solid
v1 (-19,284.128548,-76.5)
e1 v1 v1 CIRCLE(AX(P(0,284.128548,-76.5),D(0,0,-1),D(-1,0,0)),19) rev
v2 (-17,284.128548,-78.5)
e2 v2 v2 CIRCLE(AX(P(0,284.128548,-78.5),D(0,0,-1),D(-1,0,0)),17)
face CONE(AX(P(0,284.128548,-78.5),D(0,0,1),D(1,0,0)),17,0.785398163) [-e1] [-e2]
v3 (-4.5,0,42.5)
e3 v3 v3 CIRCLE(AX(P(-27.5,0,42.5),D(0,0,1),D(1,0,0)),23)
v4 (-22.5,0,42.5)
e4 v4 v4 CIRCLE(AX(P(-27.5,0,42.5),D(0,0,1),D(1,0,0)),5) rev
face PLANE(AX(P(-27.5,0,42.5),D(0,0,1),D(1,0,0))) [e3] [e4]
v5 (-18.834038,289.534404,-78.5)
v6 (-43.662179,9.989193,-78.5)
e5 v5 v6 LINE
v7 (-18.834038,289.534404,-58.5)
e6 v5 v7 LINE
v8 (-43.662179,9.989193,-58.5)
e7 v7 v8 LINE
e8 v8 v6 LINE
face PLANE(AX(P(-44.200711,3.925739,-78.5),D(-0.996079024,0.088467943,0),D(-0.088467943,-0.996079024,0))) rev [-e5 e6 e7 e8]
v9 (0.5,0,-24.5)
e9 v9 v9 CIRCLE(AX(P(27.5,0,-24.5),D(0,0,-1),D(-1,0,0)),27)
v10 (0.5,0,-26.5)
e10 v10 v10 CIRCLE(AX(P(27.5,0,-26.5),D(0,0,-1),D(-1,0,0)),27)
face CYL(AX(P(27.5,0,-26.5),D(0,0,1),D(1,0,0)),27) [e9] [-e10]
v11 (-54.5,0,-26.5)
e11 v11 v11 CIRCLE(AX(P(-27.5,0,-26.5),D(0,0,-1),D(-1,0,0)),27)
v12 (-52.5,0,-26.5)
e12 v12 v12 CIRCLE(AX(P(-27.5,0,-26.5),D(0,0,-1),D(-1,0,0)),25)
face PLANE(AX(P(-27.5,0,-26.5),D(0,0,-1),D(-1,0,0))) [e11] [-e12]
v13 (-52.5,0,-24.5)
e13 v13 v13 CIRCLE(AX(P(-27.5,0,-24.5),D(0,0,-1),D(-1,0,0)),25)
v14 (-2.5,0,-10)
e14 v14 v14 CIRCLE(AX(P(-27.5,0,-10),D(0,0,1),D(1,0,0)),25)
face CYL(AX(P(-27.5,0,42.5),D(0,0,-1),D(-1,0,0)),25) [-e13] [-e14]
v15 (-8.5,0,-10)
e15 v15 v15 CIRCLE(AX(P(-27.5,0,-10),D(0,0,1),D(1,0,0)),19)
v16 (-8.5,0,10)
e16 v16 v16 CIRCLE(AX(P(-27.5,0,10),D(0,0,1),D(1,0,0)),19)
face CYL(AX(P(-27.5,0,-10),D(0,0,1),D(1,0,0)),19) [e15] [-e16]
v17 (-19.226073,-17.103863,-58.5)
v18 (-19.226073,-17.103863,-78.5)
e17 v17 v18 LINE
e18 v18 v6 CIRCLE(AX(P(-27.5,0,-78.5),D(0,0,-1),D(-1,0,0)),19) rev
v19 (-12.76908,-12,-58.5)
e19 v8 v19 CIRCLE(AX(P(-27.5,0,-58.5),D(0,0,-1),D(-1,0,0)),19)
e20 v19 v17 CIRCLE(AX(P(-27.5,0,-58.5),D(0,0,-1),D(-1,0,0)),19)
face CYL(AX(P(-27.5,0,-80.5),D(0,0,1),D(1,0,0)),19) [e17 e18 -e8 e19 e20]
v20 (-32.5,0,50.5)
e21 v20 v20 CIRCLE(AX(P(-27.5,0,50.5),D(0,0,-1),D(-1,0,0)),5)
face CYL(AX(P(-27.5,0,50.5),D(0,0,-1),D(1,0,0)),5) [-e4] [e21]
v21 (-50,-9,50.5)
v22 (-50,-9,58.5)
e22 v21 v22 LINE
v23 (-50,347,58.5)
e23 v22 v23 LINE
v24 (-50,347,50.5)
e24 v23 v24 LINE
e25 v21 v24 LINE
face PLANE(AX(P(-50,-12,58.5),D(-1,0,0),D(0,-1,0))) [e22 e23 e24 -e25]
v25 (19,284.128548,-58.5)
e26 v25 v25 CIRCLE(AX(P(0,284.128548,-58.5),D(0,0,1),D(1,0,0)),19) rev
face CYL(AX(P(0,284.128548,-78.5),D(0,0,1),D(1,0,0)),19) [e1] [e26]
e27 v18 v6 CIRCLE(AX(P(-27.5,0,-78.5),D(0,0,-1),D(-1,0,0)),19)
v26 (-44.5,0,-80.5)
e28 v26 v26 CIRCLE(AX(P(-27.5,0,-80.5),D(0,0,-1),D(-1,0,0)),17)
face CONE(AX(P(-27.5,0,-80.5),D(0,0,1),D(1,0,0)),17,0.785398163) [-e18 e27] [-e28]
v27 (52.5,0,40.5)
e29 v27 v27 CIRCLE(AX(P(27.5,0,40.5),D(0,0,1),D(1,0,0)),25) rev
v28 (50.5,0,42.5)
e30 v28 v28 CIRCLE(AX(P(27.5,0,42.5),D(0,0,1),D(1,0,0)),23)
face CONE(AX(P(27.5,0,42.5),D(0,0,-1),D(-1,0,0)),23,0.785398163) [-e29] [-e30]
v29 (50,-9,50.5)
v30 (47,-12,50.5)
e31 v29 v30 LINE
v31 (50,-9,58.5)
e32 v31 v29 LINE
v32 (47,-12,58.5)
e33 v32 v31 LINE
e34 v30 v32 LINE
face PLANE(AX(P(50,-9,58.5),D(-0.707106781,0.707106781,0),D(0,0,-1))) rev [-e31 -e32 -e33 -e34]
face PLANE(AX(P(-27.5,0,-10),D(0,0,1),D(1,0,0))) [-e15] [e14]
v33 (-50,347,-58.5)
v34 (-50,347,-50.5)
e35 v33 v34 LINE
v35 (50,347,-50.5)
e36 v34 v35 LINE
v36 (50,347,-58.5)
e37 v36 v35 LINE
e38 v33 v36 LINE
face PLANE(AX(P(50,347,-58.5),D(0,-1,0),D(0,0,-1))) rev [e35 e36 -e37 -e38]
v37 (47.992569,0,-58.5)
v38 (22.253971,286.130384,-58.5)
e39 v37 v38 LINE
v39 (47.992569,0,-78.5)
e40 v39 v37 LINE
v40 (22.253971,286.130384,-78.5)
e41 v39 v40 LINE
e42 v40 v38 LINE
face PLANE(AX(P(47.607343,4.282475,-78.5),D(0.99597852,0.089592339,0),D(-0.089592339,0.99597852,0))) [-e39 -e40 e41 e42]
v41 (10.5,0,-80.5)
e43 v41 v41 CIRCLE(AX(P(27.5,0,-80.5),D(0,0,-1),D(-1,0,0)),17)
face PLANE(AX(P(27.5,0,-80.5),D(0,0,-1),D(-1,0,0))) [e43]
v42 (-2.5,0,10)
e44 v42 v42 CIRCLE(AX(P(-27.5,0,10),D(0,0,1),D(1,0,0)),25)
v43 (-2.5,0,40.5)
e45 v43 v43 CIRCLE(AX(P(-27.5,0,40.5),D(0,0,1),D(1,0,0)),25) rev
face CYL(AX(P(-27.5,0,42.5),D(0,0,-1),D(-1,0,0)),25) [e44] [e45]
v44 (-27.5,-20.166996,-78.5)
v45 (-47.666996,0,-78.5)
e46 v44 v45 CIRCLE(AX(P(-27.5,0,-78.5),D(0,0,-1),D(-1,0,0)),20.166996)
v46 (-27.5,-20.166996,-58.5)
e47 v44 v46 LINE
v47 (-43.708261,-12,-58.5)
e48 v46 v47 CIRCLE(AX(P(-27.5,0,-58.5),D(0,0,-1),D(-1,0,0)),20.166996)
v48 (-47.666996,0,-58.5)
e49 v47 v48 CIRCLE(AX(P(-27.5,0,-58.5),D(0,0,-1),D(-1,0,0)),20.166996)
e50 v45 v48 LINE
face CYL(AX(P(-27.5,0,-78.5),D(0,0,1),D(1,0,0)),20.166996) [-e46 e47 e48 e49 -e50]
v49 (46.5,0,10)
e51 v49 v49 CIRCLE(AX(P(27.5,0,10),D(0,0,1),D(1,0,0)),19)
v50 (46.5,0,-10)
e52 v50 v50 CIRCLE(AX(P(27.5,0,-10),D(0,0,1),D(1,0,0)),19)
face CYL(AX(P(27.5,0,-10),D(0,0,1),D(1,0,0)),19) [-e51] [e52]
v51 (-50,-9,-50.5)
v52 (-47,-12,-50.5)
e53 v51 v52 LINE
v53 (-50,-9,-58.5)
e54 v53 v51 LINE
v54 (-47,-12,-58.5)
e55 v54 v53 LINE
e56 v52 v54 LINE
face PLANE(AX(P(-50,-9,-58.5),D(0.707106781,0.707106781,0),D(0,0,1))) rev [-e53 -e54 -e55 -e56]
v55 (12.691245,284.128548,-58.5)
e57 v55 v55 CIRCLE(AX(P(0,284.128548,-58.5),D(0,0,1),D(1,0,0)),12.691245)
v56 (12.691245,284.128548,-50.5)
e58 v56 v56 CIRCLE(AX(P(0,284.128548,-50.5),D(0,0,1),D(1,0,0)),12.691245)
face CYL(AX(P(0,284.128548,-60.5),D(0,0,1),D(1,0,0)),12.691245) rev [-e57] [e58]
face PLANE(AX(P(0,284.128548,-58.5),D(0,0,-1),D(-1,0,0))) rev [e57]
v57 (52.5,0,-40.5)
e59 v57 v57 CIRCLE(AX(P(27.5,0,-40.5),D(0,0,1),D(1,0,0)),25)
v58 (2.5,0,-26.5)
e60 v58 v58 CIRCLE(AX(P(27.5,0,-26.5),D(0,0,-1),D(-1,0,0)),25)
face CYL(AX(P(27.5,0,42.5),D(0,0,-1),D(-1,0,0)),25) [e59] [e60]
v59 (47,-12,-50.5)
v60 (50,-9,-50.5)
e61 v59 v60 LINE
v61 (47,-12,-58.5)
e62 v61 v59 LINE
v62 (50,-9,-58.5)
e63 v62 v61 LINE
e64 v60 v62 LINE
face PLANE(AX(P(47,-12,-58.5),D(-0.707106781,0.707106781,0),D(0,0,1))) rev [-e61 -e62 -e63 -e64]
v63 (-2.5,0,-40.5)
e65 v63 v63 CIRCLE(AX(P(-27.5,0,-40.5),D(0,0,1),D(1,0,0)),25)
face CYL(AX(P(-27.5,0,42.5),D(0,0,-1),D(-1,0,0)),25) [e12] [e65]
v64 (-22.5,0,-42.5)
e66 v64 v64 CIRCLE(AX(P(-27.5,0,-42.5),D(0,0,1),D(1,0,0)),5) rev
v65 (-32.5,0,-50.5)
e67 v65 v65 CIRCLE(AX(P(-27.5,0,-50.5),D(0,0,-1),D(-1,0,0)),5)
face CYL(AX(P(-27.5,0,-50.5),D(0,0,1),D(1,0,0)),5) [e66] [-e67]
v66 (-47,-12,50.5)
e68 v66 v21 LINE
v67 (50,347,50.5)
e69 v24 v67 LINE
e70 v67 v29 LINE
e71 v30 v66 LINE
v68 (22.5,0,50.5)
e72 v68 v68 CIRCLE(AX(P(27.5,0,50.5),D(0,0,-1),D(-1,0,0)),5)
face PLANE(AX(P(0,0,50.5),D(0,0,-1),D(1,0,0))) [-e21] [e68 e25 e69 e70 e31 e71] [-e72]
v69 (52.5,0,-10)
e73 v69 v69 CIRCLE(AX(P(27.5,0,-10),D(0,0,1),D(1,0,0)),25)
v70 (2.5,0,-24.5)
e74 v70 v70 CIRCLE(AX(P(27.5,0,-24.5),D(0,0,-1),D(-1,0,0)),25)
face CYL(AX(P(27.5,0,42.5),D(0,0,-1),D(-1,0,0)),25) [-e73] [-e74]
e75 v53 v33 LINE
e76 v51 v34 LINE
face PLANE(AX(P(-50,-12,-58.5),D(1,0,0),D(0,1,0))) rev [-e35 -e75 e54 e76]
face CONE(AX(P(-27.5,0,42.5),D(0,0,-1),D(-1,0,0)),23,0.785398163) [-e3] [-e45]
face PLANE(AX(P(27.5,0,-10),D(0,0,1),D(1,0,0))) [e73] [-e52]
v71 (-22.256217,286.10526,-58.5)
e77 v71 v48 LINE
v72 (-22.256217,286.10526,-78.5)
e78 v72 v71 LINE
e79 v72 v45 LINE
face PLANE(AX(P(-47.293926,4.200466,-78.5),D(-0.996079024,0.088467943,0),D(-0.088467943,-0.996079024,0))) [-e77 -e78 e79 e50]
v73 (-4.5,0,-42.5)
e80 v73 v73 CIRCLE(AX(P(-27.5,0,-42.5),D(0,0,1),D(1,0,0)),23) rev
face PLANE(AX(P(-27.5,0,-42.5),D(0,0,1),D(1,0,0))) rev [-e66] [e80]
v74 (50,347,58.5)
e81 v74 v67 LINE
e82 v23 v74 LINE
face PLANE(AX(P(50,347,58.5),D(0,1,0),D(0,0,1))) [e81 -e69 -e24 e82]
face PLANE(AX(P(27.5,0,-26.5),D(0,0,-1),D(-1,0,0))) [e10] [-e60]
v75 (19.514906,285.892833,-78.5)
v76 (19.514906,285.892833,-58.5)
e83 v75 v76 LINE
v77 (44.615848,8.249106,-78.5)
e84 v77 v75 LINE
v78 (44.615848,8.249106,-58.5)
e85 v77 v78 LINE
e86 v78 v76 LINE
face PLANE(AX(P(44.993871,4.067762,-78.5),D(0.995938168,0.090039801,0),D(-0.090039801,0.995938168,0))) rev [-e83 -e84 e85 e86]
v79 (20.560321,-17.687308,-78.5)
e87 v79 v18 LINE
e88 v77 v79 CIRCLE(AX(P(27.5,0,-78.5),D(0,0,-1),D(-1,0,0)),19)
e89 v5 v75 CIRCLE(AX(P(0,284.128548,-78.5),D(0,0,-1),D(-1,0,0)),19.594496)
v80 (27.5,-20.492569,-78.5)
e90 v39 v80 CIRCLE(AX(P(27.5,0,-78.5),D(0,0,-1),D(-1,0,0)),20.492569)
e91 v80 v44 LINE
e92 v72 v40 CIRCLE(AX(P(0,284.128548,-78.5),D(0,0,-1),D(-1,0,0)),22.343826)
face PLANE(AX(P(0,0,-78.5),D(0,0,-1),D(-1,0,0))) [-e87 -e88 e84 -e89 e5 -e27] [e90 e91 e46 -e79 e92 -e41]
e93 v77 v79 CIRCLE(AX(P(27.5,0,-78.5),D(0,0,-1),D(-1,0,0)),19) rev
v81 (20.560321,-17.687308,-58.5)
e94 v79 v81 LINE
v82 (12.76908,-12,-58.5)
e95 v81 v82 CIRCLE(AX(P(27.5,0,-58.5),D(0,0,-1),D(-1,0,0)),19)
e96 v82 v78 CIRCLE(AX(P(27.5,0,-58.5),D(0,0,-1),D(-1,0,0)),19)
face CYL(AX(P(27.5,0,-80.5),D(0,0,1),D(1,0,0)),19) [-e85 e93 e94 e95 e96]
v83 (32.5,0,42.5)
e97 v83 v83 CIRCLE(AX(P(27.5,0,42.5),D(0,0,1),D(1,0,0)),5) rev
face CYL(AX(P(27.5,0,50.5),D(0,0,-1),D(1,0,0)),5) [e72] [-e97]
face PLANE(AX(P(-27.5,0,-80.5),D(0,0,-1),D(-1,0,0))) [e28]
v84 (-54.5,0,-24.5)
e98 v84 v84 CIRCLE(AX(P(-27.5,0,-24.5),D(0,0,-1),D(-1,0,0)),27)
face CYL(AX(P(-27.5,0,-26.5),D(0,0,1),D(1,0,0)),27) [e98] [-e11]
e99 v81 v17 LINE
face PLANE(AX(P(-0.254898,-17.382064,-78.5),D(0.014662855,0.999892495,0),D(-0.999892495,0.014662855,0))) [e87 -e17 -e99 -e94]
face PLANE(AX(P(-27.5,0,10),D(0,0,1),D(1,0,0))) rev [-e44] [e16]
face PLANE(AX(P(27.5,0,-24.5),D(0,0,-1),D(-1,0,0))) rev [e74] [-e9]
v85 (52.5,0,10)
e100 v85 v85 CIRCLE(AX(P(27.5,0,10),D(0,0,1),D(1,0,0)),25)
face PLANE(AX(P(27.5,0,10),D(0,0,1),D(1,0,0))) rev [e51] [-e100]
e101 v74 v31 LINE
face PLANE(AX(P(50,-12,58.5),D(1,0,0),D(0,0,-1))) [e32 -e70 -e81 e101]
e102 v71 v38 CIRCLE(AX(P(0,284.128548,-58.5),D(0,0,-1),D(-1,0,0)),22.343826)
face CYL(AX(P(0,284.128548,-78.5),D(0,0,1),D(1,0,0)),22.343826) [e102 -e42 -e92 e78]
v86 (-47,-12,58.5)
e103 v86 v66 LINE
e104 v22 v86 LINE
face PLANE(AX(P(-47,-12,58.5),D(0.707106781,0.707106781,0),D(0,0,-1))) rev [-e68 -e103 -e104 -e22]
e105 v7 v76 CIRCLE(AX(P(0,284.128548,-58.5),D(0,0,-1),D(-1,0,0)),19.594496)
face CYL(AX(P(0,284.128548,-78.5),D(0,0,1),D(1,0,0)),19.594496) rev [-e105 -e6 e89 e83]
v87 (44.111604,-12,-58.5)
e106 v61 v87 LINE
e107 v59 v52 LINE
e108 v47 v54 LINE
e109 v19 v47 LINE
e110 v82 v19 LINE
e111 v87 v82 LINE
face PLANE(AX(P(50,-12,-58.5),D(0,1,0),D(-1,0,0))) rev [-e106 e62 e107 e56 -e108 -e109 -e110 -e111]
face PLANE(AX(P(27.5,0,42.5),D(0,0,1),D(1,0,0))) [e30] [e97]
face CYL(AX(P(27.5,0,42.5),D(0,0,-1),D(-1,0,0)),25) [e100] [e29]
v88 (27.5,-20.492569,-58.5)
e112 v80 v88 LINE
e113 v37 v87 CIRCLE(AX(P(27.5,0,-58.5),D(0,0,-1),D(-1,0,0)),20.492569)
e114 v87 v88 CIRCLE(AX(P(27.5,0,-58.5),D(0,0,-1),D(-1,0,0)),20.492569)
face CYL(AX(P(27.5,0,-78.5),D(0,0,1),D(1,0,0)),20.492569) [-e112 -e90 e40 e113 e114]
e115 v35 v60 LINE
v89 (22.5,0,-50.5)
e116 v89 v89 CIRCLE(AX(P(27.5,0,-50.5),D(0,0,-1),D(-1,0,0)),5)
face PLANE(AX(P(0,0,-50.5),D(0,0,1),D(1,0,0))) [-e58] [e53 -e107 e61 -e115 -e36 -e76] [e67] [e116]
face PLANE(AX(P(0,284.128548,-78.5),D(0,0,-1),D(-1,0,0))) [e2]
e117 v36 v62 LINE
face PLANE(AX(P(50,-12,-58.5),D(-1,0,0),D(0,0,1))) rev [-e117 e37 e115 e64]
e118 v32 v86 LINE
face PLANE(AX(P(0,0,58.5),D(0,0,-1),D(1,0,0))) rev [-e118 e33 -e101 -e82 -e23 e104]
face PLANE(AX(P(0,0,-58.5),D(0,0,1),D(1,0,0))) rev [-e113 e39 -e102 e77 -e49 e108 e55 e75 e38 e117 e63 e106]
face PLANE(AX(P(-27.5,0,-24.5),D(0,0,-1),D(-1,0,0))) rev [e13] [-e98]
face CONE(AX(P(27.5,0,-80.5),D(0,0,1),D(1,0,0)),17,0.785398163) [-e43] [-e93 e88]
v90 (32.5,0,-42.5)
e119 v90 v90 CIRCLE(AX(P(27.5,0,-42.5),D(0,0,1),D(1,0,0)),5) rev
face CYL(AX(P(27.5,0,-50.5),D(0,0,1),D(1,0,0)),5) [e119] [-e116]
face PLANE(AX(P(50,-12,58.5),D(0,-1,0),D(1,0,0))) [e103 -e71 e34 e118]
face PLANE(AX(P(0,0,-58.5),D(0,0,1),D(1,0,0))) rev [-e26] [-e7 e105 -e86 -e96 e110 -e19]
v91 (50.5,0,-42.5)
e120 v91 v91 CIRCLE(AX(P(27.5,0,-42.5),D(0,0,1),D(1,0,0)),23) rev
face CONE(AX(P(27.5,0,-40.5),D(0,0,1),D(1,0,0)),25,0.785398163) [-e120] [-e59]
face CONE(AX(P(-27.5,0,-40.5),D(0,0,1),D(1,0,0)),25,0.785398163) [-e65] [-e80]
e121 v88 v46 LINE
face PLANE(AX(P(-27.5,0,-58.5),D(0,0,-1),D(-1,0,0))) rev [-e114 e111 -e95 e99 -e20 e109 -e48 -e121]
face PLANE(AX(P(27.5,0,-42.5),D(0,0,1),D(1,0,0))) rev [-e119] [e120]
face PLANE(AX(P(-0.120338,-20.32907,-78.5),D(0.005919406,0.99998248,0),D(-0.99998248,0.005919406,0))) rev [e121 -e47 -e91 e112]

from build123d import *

# Parameters (mm, degrees)
SKETCH_1_R          = 25
EXTRUDE_1_DEPTH     = 42.5
EXTRUDE_1_2_DEPTH   = 42.5
SKETCH_2_R          = 25
SKETCH_2_R_2        = 19
CUT_EXTRUDE_1_DEPTH = 10
CHAMFER_1_SIZE      = 2
SKETCH_3_R          = 5
EXTRUDE_2_DEPTH     = 8
SKETCH_4_W          = 100
SKETCH_4_H          = 359
EXTRUDE_3_DEPTH     = 8
CHAMFER_2_SIZE      = 3
EXTRUDE_START       = 22
SKETCH_5_R          = 19
EXTRUDE_4_DEPTH     = 22
SKETCH_7_R          = 12.691244745
CUT_EXTRUDE_2_DEPTH = 10
SKETCH_8_R          = 19
EXTRUDE_5_DEPTH     = 20
EXTRUDE_6_DEPTH     = 20
CHAMFER_3_SIZE      = 2
CHAMFER_4_SIZE      = 2
SKETCH_11_R         = 27
EXTRUDE_8_DEPTH     = 2


with BuildPart() as part:
    # 草图1 → 凸台-拉伸1 (new, symmetric)
    with BuildSketch(Plane.XY):
        with Locations((-27.5, 0)):
            Circle(SKETCH_1_R)
    extrude(amount=EXTRUDE_1_DEPTH, both=True)


with BuildPart() as body_2:
    # 草图1 → Extrude 1 2 (new, symmetric)
    with BuildSketch(Plane.XY):
        with Locations((27.5, 0)):
            Circle(SKETCH_1_R)
    extrude(amount=EXTRUDE_1_2_DEPTH, both=True)


with BuildPart() as cut_extrude_1_tool:
    # 草图2 → 切除-拉伸1 (new, symmetric)
    # profile 1 of 2: a face of its own
    with BuildSketch(Plane.XY):
        with Locations((-27.5, 0)):
            Circle(SKETCH_2_R)
        with Locations((-27.5, 0)):
            Circle(SKETCH_2_R_2, mode=Mode.SUBTRACT)
    # profile 2 of 2: a face of its own
    with BuildSketch(Plane.XY):
        with Locations((27.5, 0)):
            Circle(SKETCH_2_R)
        with Locations((27.5, 0)):
            Circle(SKETCH_2_R_2, mode=Mode.SUBTRACT)
    extrude(amount=CUT_EXTRUDE_1_DEPTH, both=True)


with BuildPart() as part_1:
    add(part.part)

    # 切除-拉伸1: cut by cut_extrude_1_tool
    add(cut_extrude_1_tool.part, mode=Mode.SUBTRACT)



with BuildPart() as body_2_1:
    add(body_2.part)

    # 切除-拉伸1: cut by cut_extrude_1_tool
    add(cut_extrude_1_tool.part, mode=Mode.SUBTRACT)

    # 倒角1
    chamfer_1_edges = [body_2_1.edges().sort_by_distance(p)[0] for p in [
        (2.5, 0, -42.5),
        (2.5, 0, 42.5),
    ]]
    chamfer(chamfer_1_edges, length=CHAMFER_1_SIZE)


with BuildPart() as part_2:
    add(part_1.part)

    add(body_2_1.part)  # 凸台-拉伸2 merges body 2
    # 草图3 → 凸台-拉伸2 (add)
    with BuildSketch(Plane(origin=(0, 0, -42.5), x_dir=(-1, 0, 0), z_dir=(0, 0, -1))):
        with Locations(Location((-27.5, 0, 0), (0, 0, 180))):
            Circle(SKETCH_3_R)
        with Locations(Location((27.5, 0, 0), (0, 0, 180))):
            Circle(SKETCH_3_R)
    extrude_2 = extrude(amount=EXTRUDE_2_DEPTH)

    # 镜向1: 凸台-拉伸2 across plane
    add(extrude_2.mirror(Plane.XY))

    # 草图4 → 凸台-拉伸3 (add)
    with BuildSketch(Plane(origin=(0, 0, -50.5), x_dir=(-1, 0, 0), z_dir=(0, 0, -1))):
        with Locations((0, 167.5)):
            Rectangle(SKETCH_4_W, SKETCH_4_H)
    extrude_3 = extrude(amount=EXTRUDE_3_DEPTH)

    # 镜向2: 凸台-拉伸3 across plane
    add(extrude_3.mirror(Plane.XY))

    # 倒角2
    chamfer_2_edges = [part_2.edges().sort_by_distance(p)[0] for p in [
        (50, -12, -54.5),
        (-50, -12, -54.5),
        (50, -12, 54.5),
        (-50, -12, 54.5),
    ]]
    chamfer(chamfer_2_edges, length=CHAMFER_2_SIZE)

    # 草图5 → 凸台-拉伸4 (add)
    with BuildSketch(Plane(origin=(0, 0, -58.5), x_dir=(-1, 0, 0), z_dir=(0, 0, -1)).offset(EXTRUDE_START)):
        with Locations(Location((27.5, 0, 0), (0, 0, 180))):
            Circle(SKETCH_5_R)
        with Locations(Location((-27.5, 0, 0), (0, 0, 180))):
            Circle(SKETCH_5_R)
    extrude(amount=-EXTRUDE_4_DEPTH)

    # 草图7 → 切除-拉伸2 (cut)
    with BuildSketch(Plane.XY.offset(-50.5)):
        with Locations((0, 284.128548052)):
            Circle(SKETCH_7_R)
    extrude(amount=-CUT_EXTRUDE_2_DEPTH, mode=Mode.SUBTRACT)

    # 草图8 → 凸台-拉伸5 (add)
    with BuildSketch(Plane(origin=(0, 0, -58.5), x_dir=(-1, 0, 0), z_dir=(0, 0, -1))):
        with Locations(Location((0, 284.128548052, 0), (0, 0, 180))):
            Circle(SKETCH_8_R)
    extrude(amount=EXTRUDE_5_DEPTH)

    # 草图9 → 凸台-拉伸6 (add)
    with BuildSketch(Plane(origin=(0, 0, -58.5), x_dir=(-1, 0, 0), z_dir=(0, 0, -1))):
        with BuildLine():
            Line((-47.663589703, 3.657187648), (-47.992568683, 0))
            ThreePointArc((-47.992568683, 0), (-41.99043428, -14.49043428), (-27.5, -20.492568683))
            Line((-27.5, -20.492568683), (-27.257396579, -20.491132589))
            Line((-27.257396579, -20.491132589), (27.5, -20.166995645))
            ThreePointArc((27.5, -20.166995645), (41.760219376, -14.260219376), (47.666995645, 0))
            Line((47.666995645, 0), (47.351318556, 3.554274177))
            Line((47.351318556, 3.554274177), (22.256216625, 286.105260405))
            ThreePointArc((22.256216625, 286.105260405), (0.012611737, 306.472370714), (-22.253970975, 286.130383715))
            Line((-22.253970975, 286.130383715), (-47.663589703, 3.657187648))
        make_face()
        with BuildLine():
            ThreePointArc((-19.514906453, 285.892832564), (-1.852338091, 303.635293483), (18.83403815, 289.534404199))
            Line((18.83403815, 289.534404199), (44.24481717, 3.429143794))
            ThreePointArc((44.24481717, 3.429143794), (40.523912674, -10.592577543), (27.5, -16.98253045))
            Line((27.5, -16.98253045), (-26.978378853, -17.781424905))
            ThreePointArc((-26.978378853, -17.781424905), (-27.239161385, -17.78716176), (-27.5, -17.789074183))
            ThreePointArc((-27.5, -17.789074183), (-41.187186564, -11.397239057), (-45.072256133, 3.200735692))
            Line((-45.072256133, 3.200735692), (-19.514906453, 285.892832564))
        make_face(mode=Mode.SUBTRACT)
    extrude(amount=EXTRUDE_6_DEPTH)

    # 倒角3
    chamfer_3_edges = [part_2.edges().sort_by_distance(p)[0] for p in [
        (-19, 284.128548052, -78.5),
        (-46.5, 0, -80.5),
        (8.5, 0, -80.5),
    ]]
    chamfer(chamfer_3_edges, length=CHAMFER_3_SIZE - 0.0001)  # a hair under: the kernel refuses the full size

    # 倒角4
    chamfer_4_edges = [part_2.edges().sort_by_distance(p)[0] for p in [
        (-52.5, 0, -42.5),
        (-52.5, 0, 42.5),
    ]]
    chamfer(chamfer_4_edges, length=CHAMFER_4_SIZE)

    # 草图11 → 凸台-拉伸8 (add)
    with BuildSketch(Plane(origin=(0, 0, -24.5), x_dir=(-1, 0, 0), z_dir=(0, 0, -1))):
        with Locations((27.5, 0)):
            Circle(SKETCH_11_R)
        with Locations((-27.5, 0)):
            Circle(SKETCH_11_R)
    extrude(amount=EXTRUDE_8_DEPTH)


solid = part_2.part
